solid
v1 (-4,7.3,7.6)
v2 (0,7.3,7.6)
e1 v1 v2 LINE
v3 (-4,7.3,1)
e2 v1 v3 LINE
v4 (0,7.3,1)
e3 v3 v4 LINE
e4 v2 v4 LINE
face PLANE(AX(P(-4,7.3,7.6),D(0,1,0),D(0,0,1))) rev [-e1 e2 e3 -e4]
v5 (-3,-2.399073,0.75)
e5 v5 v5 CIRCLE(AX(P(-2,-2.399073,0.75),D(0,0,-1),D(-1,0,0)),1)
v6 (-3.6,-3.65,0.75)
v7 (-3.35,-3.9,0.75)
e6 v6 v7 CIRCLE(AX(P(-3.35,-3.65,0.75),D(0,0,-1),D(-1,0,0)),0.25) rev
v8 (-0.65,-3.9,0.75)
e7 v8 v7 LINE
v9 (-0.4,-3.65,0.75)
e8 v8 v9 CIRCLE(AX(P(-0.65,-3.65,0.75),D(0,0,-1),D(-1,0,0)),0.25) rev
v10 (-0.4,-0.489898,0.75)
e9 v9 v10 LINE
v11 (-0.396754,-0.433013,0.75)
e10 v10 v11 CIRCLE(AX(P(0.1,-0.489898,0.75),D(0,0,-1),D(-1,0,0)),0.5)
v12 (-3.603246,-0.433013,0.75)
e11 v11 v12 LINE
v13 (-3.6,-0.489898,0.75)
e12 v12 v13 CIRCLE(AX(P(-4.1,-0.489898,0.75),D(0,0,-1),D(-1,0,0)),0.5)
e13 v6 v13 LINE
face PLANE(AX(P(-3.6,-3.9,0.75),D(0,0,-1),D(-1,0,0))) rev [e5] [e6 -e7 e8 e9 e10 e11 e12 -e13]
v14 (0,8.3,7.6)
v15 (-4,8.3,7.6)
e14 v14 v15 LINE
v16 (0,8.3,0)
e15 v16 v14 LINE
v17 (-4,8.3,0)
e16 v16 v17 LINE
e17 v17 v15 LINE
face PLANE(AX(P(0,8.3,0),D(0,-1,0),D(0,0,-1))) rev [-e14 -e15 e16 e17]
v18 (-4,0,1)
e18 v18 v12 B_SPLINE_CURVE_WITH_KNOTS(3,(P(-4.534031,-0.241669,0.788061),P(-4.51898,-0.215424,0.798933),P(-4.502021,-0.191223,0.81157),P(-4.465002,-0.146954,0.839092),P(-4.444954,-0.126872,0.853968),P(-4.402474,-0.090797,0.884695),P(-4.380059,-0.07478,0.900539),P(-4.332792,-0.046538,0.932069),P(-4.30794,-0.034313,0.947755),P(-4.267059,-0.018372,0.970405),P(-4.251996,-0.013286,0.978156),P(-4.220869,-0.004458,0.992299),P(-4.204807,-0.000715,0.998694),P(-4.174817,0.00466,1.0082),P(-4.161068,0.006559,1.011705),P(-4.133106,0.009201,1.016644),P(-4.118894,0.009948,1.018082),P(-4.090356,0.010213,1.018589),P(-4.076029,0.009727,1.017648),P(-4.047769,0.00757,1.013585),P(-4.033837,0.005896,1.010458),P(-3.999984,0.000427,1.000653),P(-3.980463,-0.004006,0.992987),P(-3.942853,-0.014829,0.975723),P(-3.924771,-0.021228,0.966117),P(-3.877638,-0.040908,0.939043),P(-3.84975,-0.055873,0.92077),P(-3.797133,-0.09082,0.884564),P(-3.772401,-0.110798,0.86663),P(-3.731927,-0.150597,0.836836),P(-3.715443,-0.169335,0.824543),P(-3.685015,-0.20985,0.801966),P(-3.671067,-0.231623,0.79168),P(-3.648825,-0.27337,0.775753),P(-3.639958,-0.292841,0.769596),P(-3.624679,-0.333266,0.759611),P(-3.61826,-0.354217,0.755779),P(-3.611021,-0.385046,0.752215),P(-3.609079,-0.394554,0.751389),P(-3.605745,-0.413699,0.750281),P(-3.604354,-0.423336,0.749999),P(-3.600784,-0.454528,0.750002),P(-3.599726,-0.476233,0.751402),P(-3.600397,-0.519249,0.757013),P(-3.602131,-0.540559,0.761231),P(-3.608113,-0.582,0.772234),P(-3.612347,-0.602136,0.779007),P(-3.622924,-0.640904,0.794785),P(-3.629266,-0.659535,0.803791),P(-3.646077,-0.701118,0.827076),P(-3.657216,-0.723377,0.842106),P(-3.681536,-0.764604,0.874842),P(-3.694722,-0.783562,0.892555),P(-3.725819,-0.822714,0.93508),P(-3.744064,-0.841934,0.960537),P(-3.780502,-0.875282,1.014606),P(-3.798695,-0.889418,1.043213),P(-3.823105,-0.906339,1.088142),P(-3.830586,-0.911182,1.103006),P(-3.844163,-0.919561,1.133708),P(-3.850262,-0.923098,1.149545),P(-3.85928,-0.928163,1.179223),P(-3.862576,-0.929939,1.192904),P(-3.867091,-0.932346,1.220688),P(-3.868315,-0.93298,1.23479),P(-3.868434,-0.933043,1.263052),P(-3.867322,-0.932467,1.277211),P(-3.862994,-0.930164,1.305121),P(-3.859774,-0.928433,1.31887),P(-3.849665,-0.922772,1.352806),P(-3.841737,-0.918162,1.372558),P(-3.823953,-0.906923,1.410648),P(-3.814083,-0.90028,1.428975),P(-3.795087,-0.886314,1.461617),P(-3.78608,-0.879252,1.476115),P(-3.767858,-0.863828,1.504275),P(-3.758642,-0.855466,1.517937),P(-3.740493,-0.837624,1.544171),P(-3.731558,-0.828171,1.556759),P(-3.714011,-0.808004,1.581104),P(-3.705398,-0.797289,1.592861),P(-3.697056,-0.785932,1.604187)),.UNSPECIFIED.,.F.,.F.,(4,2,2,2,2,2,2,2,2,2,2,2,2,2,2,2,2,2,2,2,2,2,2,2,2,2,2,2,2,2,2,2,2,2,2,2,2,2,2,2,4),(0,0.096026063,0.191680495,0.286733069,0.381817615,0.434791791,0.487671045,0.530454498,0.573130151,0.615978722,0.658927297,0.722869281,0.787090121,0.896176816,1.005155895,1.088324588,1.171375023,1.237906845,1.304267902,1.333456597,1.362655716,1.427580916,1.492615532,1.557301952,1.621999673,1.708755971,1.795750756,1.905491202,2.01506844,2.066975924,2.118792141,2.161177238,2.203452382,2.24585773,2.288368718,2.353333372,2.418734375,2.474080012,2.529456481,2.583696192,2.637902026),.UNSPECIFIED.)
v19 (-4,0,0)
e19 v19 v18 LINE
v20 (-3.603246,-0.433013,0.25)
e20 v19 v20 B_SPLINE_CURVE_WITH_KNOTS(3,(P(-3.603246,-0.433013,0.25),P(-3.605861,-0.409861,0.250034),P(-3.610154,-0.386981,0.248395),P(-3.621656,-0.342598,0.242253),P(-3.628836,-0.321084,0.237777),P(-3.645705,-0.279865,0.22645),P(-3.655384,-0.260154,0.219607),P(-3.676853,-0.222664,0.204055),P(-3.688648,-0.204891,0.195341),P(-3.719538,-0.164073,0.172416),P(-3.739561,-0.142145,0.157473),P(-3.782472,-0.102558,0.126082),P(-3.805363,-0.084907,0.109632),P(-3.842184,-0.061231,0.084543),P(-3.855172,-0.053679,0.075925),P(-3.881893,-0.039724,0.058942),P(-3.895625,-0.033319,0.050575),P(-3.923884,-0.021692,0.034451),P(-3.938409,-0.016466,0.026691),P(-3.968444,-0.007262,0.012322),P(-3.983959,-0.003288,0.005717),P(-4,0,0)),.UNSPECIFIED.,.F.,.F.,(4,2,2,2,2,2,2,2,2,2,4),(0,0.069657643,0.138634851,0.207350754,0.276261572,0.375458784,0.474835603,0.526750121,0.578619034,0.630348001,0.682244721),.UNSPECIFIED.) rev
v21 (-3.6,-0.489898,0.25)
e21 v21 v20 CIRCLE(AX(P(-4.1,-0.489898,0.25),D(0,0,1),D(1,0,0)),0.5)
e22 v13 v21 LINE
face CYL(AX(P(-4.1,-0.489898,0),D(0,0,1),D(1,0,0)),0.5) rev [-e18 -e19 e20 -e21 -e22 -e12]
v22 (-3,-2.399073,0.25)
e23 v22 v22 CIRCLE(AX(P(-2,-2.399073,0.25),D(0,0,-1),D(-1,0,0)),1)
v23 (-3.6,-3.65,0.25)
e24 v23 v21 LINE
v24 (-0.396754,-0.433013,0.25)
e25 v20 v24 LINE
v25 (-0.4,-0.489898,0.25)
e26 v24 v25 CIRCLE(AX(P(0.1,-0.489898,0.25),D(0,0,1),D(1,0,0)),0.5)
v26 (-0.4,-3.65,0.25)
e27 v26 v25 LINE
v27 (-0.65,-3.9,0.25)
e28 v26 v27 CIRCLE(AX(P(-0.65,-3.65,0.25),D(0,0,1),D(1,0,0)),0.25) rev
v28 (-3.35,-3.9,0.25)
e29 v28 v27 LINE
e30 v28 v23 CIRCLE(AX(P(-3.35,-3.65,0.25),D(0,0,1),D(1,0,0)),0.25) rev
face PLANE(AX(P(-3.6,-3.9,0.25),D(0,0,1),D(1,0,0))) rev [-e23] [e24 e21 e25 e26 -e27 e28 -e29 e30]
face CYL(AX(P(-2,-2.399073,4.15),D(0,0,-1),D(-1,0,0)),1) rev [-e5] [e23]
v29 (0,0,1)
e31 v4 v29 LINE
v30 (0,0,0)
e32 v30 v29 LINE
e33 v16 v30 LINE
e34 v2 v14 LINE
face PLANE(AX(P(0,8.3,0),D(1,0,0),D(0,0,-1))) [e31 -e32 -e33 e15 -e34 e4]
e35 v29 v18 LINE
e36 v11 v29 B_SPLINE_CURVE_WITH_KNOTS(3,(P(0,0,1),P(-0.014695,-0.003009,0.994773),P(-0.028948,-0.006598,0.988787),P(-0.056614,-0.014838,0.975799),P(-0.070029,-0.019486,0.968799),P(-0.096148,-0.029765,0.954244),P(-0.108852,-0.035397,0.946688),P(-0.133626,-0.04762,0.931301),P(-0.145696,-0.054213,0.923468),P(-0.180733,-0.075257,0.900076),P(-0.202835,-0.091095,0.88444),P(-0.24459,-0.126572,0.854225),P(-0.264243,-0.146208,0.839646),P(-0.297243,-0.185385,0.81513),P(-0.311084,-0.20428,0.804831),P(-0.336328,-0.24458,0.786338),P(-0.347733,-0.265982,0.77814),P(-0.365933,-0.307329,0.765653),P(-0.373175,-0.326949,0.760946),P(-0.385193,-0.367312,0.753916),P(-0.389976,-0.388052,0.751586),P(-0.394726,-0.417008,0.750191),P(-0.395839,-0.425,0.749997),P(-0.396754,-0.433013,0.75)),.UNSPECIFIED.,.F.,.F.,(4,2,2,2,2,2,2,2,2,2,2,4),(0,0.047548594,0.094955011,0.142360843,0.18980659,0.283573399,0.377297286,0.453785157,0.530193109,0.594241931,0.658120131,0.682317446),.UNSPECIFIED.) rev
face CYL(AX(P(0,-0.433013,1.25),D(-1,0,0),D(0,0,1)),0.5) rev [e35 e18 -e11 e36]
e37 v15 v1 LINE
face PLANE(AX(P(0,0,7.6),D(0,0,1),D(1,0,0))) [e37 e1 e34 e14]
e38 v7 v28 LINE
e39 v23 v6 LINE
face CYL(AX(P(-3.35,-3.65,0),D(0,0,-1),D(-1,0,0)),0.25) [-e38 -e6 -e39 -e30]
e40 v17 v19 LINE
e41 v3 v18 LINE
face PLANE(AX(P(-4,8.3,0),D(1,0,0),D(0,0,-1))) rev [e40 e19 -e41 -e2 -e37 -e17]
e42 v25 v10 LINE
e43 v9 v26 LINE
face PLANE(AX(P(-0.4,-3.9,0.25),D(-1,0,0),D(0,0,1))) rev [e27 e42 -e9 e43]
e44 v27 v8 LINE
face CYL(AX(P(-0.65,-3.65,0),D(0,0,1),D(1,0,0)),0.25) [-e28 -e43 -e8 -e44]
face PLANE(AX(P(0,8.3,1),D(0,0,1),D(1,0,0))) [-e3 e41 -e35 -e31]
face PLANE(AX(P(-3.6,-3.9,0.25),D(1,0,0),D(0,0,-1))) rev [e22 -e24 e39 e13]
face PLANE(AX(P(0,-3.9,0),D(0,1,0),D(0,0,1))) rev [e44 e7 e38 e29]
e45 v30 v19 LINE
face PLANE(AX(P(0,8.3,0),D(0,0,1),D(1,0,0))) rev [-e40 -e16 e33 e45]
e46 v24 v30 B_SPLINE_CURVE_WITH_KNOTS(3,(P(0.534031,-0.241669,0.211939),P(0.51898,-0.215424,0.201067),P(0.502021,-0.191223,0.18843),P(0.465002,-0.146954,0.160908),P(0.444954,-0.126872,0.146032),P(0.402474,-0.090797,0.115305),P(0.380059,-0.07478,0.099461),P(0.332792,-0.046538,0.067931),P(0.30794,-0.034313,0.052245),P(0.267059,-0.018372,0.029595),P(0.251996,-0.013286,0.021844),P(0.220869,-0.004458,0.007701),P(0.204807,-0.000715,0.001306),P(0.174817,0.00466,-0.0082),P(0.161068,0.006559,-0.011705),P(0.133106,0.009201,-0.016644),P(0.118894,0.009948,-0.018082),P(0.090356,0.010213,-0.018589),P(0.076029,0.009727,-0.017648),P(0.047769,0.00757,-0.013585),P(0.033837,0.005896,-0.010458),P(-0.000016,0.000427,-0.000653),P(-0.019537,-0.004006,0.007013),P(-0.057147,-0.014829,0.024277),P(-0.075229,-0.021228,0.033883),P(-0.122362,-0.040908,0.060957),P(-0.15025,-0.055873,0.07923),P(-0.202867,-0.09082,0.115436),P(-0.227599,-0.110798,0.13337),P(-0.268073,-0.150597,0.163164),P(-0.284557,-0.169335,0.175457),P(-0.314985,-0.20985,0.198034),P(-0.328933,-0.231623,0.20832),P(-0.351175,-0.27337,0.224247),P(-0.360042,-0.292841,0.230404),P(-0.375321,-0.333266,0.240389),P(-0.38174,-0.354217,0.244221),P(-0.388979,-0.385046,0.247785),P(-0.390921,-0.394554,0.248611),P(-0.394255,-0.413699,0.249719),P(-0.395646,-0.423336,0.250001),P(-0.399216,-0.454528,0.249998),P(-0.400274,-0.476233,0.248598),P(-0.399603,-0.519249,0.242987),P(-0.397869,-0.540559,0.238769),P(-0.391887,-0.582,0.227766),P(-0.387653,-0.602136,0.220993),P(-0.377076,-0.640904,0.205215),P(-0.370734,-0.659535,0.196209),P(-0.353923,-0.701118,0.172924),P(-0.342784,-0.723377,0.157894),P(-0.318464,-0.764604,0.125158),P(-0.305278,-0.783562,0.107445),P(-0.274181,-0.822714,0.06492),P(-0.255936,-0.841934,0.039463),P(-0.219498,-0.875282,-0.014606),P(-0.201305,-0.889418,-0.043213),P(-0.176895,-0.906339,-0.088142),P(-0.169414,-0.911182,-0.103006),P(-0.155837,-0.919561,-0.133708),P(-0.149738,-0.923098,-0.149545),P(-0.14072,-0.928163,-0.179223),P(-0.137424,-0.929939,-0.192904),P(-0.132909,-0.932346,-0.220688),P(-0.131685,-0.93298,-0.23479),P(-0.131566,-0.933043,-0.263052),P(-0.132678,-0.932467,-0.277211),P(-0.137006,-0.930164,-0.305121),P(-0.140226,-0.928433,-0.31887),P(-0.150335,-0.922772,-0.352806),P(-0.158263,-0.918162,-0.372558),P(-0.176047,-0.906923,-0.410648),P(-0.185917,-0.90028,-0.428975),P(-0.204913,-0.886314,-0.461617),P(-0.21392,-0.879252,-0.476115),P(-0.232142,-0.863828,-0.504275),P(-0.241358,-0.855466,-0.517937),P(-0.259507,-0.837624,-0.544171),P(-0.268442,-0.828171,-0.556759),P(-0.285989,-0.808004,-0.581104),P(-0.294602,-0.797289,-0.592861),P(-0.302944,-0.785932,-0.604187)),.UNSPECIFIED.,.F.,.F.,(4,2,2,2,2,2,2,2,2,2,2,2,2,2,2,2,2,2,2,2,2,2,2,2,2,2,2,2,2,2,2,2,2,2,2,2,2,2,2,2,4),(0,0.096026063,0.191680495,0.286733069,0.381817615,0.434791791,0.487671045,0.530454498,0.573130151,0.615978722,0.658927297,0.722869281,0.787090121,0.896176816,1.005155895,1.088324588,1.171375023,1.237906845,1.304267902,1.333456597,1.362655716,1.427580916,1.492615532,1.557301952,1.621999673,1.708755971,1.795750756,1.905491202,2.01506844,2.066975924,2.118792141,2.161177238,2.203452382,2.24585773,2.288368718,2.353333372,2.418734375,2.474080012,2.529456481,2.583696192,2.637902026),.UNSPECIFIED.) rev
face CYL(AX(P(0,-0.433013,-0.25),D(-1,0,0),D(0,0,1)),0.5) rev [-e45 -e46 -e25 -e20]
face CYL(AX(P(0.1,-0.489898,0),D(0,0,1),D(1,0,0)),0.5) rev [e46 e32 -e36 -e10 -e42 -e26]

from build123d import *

# Parameters (mm, degrees)
SZKIC1_W                    = 4
SZKIC1_H                    = 1
DODANIE_WYCI_GNI_CIE1_DEPTH = 8.3
SZKIC2_W                    = 4
SZKIC2_H                    = 1
DODANIE_WYCI_GNI_CIE2_DEPTH = 6.6
SZKIC3_W                    = 3.2
SZKIC3_H                    = 0.5
DODANIE_WYCI_GNI_CIE3_DEPTH = 3.9
ZAOKR_GLENIE1_R             = 0.5
ZAOKR_GLENIE2_R             = 0.25
SZKIC4_R                    = 1
WYTNIJ_WYCI_GNI_CIE1_DEPTH  = 3.9


with BuildPart() as part:
    # Szkic1 → Dodanie-wyciągnięcie1 (new body)
    with BuildSketch(Plane(origin=(0, 0, 0), x_dir=(1, 0, 0), z_dir=(0, 1, 0))):
        with Locations((-2, -0.5)):
            Rectangle(SZKIC1_W, SZKIC1_H)
    extrude(amount=DODANIE_WYCI_GNI_CIE1_DEPTH)

    # Szkic2 → Dodanie-wyciągnięcie2 (add)
    with BuildSketch(Plane.XY.offset(1)):
        with Locations((-2, 7.8)):
            Rectangle(SZKIC2_W, SZKIC2_H)
    extrude(amount=DODANIE_WYCI_GNI_CIE2_DEPTH)

    # Szkic3 → Dodanie-wyciągnięcie3 (add)
    with BuildSketch(Plane.XZ):
        with Locations((-2, 0.5)):
            Rectangle(SZKIC3_W, SZKIC3_H)
    extrude(amount=DODANIE_WYCI_GNI_CIE3_DEPTH)

    # Zaokrąglenie1
    # the kernel refuses this fillet: 0.5 mm, written as the material it adds along each edge
    with BuildSketch(Plane(origin=(-0.4, 0, 0.25), x_dir=(1.0, -1.5702716904537035e-12, 0), z_dir=(0, 0, 1)), Plane(origin=(-3.6, 0, 0.75), x_dir=(-1.0, -1.5702716904537041e-12, 0), z_dir=(0, 0, -1))) as zaokr_glenie1_piece_1:
        with BuildLine():
            CenterArc((0.5, -0.489897949), ZAOKR_GLENIE1_R, 101.536959033, 78.463040967)
            Line((0, -0.489897949), (-0.01, -0.489897949))
            Line((-0.01, -0.489897949), (-0.01, 0))
            Line((-0.01, 0), (0, 0.01))
            ThreePointArc((0, 0.01), (0.2, 0.01), (0.398, 0.009797959))
            Line((0.398, 0.009797959), (0.4, 0))
        make_face()
    extrude(amount=0.5)
    with BuildSketch(Plane(origin=(-0.4, 0, 0.75), x_dir=(0, 0, 1), z_dir=(-1, 0, 0)), Plane(origin=(-3.6, 0, 0.25), x_dir=(0, 0, -1), z_dir=(1, 0, 0))) as zaokr_glenie1_piece_2:
        with BuildLine():
            CenterArc((0.5, -0.433012702), ZAOKR_GLENIE1_R, 120, 60)
            Line((0, -0.433012702), (-0.01, -0.433012702))
            Line((-0.01, -0.433012702), (-0.01, 0))
            Line((-0.01, 0), (0, 0.01))
            ThreePointArc((0, 0.01), (0.125, 0.01), (0.245, 0.008660254))
            Line((0.245, 0.008660254), (0.25, 0))
        make_face()
    extrude(amount=3.2)
    with BuildSketch(Plane(origin=(-0.4, 0, -0.974744871), x_dir=(1.0, -1.5702716904537035e-12, 0), z_dir=(0, 0, 1))) as zaokr_glenie1_piece_3a_section:
        with BuildLine():
            CenterArc((0.5, -0.489897949), ZAOKR_GLENIE1_R, 101.536959033, 78.463040967)
            Line((0, -0.489897949), (-0.01, -0.489897949))
            Line((-0.01, -0.489897949), (-0.01, 0))
            Line((-0.01, 0), (0, 0.01))
            ThreePointArc((0, 0.01), (0.2, 0.01), (0.398, 0.009797959))
            Line((0.398, 0.009797959), (0.4, 0))
        make_face()
    zaokr_glenie1_piece_3a = extrude(amount=1.724744871, mode=Mode.PRIVATE)
    zaokr_glenie1_piece_3a = split(zaokr_glenie1_piece_3a, bisect_by=Plane(origin=(-0.300219951, -0.114308546, 0), z_dir=(0, 0, 1)), keep=Keep.TOP, mode=Mode.PRIVATE)
    zaokr_glenie1_piece_3a = split(zaokr_glenie1_piece_3a, bisect_by=Plane(origin=(-0.300219951, -0.114308546, 0.25), z_dir=(0, 0, -1)), keep=Keep.TOP, mode=Mode.PRIVATE)
    with BuildSketch(Plane(origin=(-3.6, 0, 0.25), x_dir=(0, 0, -1), z_dir=(1, 0, 0))) as zaokr_glenie1_piece_3b_section:
        with BuildLine():
            CenterArc((0.5, -0.433012702), ZAOKR_GLENIE1_R, 120, 60)
            Line((0, -0.433012702), (-0.01, -0.433012702))
            Line((-0.01, -0.433012702), (-0.01, 0))
            Line((-0.01, 0), (0, 0.01))
            ThreePointArc((0, 0.01), (0.125, 0.01), (0.245, 0.008660254))
            Line((0.245, 0.008660254), (0.25, 0))
        make_face()
    zaokr_glenie1_piece_3b = extrude(amount=4.282531755, mode=Mode.PRIVATE)
    zaokr_glenie1_piece_3b = split(zaokr_glenie1_piece_3b, bisect_by=Plane(origin=(0, -0.108155223, 0.185241644), z_dir=(-1, 0, 0)), keep=Keep.TOP, mode=Mode.PRIVATE)
    zaokr_glenie1_piece_3b = split(zaokr_glenie1_piece_3b, bisect_by=Plane(origin=(-0.4, -0.108155223, 0.185241644), z_dir=(1, 0, 0)), keep=Keep.TOP, mode=Mode.PRIVATE)
    zaokr_glenie1_piece_3 = zaokr_glenie1_piece_3a & zaokr_glenie1_piece_3b
    add(zaokr_glenie1_piece_3)
    with BuildSketch(Plane(origin=(0.682531755, 0, 0.75), x_dir=(0, 0, 1), z_dir=(-1, 0, 0))) as zaokr_glenie1_piece_4a_section:
        with BuildLine():
            CenterArc((0.5, -0.433012702), ZAOKR_GLENIE1_R, 120, 60)
            Line((0, -0.433012702), (-0.01, -0.433012702))
            Line((-0.01, -0.433012702), (-0.01, 0))
            Line((-0.01, 0), (0, 0.01))
            ThreePointArc((0, 0.01), (0.125, 0.01), (0.245, 0.008660254))
            Line((0.245, 0.008660254), (0.25, 0))
        make_face()
    zaokr_glenie1_piece_4a = extrude(amount=4.282531755, mode=Mode.PRIVATE)
    zaokr_glenie1_piece_4a = split(zaokr_glenie1_piece_4a, bisect_by=Plane(origin=(0, -0.108155223, 0.814758356), z_dir=(-1, 0, 0)), keep=Keep.TOP, mode=Mode.PRIVATE)
    zaokr_glenie1_piece_4a = split(zaokr_glenie1_piece_4a, bisect_by=Plane(origin=(-0.4, -0.108155223, 0.814758356), z_dir=(1, 0, 0)), keep=Keep.TOP, mode=Mode.PRIVATE)
    with BuildSketch(Plane(origin=(-0.4, 0, 0.25), x_dir=(1.0, -1.5702716904537035e-12, 0), z_dir=(0, 0, 1))) as zaokr_glenie1_piece_4b_section:
        with BuildLine():
            CenterArc((0.5, -0.489897949), ZAOKR_GLENIE1_R, 101.536959033, 78.463040967)
            Line((0, -0.489897949), (-0.01, -0.489897949))
            Line((-0.01, -0.489897949), (-0.01, 0))
            Line((-0.01, 0), (0, 0.01))
            ThreePointArc((0, 0.01), (0.2, 0.01), (0.398, 0.009797959))
            Line((0.398, 0.009797959), (0.4, 0))
        make_face()
    zaokr_glenie1_piece_4b = extrude(amount=1.724744871, mode=Mode.PRIVATE)
    zaokr_glenie1_piece_4b = split(zaokr_glenie1_piece_4b, bisect_by=Plane(origin=(-0.300219951, -0.114308546, 1), z_dir=(0, 0, -1)), keep=Keep.TOP, mode=Mode.PRIVATE)
    zaokr_glenie1_piece_4b = split(zaokr_glenie1_piece_4b, bisect_by=Plane(origin=(-0.300219951, -0.114308546, 0.75), z_dir=(0, 0, 1)), keep=Keep.TOP, mode=Mode.PRIVATE)
    zaokr_glenie1_piece_4 = zaokr_glenie1_piece_4a & zaokr_glenie1_piece_4b
    add(zaokr_glenie1_piece_4)
    with BuildSketch(Plane(origin=(-3.6, 0, 1.974744871), x_dir=(-1.0, -1.5702716904537041e-12, 0), z_dir=(0, 0, -1))) as zaokr_glenie1_piece_5a_section:
        with BuildLine():
            CenterArc((0.5, -0.489897949), ZAOKR_GLENIE1_R, 101.536959033, 78.463040967)
            Line((0, -0.489897949), (-0.01, -0.489897949))
            Line((-0.01, -0.489897949), (-0.01, 0))
            Line((-0.01, 0), (0, 0.01))
            ThreePointArc((0, 0.01), (0.2, 0.01), (0.398, 0.009797959))
            Line((0.398, 0.009797959), (0.4, 0))
        make_face()
    zaokr_glenie1_piece_5a = extrude(amount=1.724744871, mode=Mode.PRIVATE)
    zaokr_glenie1_piece_5a = split(zaokr_glenie1_piece_5a, bisect_by=Plane(origin=(-3.699780049, -0.114308546, 1), z_dir=(0, 0, -1)), keep=Keep.TOP, mode=Mode.PRIVATE)
    zaokr_glenie1_piece_5a = split(zaokr_glenie1_piece_5a, bisect_by=Plane(origin=(-3.699780049, -0.114308546, 0.75), z_dir=(0, 0, 1)), keep=Keep.TOP, mode=Mode.PRIVATE)
    with BuildSketch(Plane(origin=(-0.4, 0, 0.75), x_dir=(0, 0, 1), z_dir=(-1, 0, 0))) as zaokr_glenie1_piece_5b_section:
        with BuildLine():
            CenterArc((0.5, -0.433012702), ZAOKR_GLENIE1_R, 120, 60)
            Line((0, -0.433012702), (-0.01, -0.433012702))
            Line((-0.01, -0.433012702), (-0.01, 0))
            Line((-0.01, 0), (0, 0.01))
            ThreePointArc((0, 0.01), (0.125, 0.01), (0.245, 0.008660254))
            Line((0.245, 0.008660254), (0.25, 0))
        make_face()
    zaokr_glenie1_piece_5b = extrude(amount=4.282531755, mode=Mode.PRIVATE)
    zaokr_glenie1_piece_5b = split(zaokr_glenie1_piece_5b, bisect_by=Plane(origin=(-4, -0.108155223, 0.814758356), z_dir=(1, 0, 0)), keep=Keep.TOP, mode=Mode.PRIVATE)
    zaokr_glenie1_piece_5b = split(zaokr_glenie1_piece_5b, bisect_by=Plane(origin=(-3.6, -0.108155223, 0.814758356), z_dir=(-1, 0, 0)), keep=Keep.TOP, mode=Mode.PRIVATE)
    zaokr_glenie1_piece_5 = zaokr_glenie1_piece_5a & zaokr_glenie1_piece_5b
    add(zaokr_glenie1_piece_5)
    with BuildSketch(Plane(origin=(-3.6, 0, 0.75), x_dir=(-1.0, -1.5702716904537041e-12, 0), z_dir=(0, 0, -1))) as zaokr_glenie1_piece_6a_section:
        with BuildLine():
            CenterArc((0.5, -0.489897949), ZAOKR_GLENIE1_R, 101.536959033, 78.463040967)
            Line((0, -0.489897949), (-0.01, -0.489897949))
            Line((-0.01, -0.489897949), (-0.01, 0))
            Line((-0.01, 0), (0, 0.01))
            ThreePointArc((0, 0.01), (0.2, 0.01), (0.398, 0.009797959))
            Line((0.398, 0.009797959), (0.4, 0))
        make_face()
    zaokr_glenie1_piece_6a = extrude(amount=1.724744871, mode=Mode.PRIVATE)
    zaokr_glenie1_piece_6a = split(zaokr_glenie1_piece_6a, bisect_by=Plane(origin=(-3.699780049, -0.114308546, 0), z_dir=(0, 0, 1)), keep=Keep.TOP, mode=Mode.PRIVATE)
    zaokr_glenie1_piece_6a = split(zaokr_glenie1_piece_6a, bisect_by=Plane(origin=(-3.699780049, -0.114308546, 0.25), z_dir=(0, 0, -1)), keep=Keep.TOP, mode=Mode.PRIVATE)
    with BuildSketch(Plane(origin=(-4.682531755, 0, 0.25), x_dir=(0, 0, -1), z_dir=(1, 0, 0))) as zaokr_glenie1_piece_6b_section:
        with BuildLine():
            CenterArc((0.5, -0.433012702), ZAOKR_GLENIE1_R, 120, 60)
            Line((0, -0.433012702), (-0.01, -0.433012702))
            Line((-0.01, -0.433012702), (-0.01, 0))
            Line((-0.01, 0), (0, 0.01))
            ThreePointArc((0, 0.01), (0.125, 0.01), (0.245, 0.008660254))
            Line((0.245, 0.008660254), (0.25, 0))
        make_face()
    zaokr_glenie1_piece_6b = extrude(amount=4.282531755, mode=Mode.PRIVATE)
    zaokr_glenie1_piece_6b = split(zaokr_glenie1_piece_6b, bisect_by=Plane(origin=(-4, -0.108155223, 0.185241644), z_dir=(1, 0, 0)), keep=Keep.TOP, mode=Mode.PRIVATE)
    zaokr_glenie1_piece_6b = split(zaokr_glenie1_piece_6b, bisect_by=Plane(origin=(-3.6, -0.108155223, 0.185241644), z_dir=(-1, 0, 0)), keep=Keep.TOP, mode=Mode.PRIVATE)
    zaokr_glenie1_piece_6 = zaokr_glenie1_piece_6a & zaokr_glenie1_piece_6b
    add(zaokr_glenie1_piece_6)

    # Zaokrąglenie2
    zaokr_glenie2_edges = [part.edges().sort_by_distance(p)[0] for p in [
        (-0.4, -3.9, 0.5),
        (-3.6, -3.9, 0.5),
    ]]
    fillet(zaokr_glenie2_edges, radius=ZAOKR_GLENIE2_R)

    # Szkic4 → Wytnij-wyciągnięcie1 (cut)
    with BuildSketch(Plane(origin=(0, 0, 0.25), x_dir=(-1, 0, 0), z_dir=(0, 0, -1))):
        with Locations((2, -2.399073148)):
            Circle(SZKIC4_R)
    extrude(amount=-WYTNIJ_WYCI_GNI_CIE1_DEPTH, mode=Mode.SUBTRACT)


solid = part.part
